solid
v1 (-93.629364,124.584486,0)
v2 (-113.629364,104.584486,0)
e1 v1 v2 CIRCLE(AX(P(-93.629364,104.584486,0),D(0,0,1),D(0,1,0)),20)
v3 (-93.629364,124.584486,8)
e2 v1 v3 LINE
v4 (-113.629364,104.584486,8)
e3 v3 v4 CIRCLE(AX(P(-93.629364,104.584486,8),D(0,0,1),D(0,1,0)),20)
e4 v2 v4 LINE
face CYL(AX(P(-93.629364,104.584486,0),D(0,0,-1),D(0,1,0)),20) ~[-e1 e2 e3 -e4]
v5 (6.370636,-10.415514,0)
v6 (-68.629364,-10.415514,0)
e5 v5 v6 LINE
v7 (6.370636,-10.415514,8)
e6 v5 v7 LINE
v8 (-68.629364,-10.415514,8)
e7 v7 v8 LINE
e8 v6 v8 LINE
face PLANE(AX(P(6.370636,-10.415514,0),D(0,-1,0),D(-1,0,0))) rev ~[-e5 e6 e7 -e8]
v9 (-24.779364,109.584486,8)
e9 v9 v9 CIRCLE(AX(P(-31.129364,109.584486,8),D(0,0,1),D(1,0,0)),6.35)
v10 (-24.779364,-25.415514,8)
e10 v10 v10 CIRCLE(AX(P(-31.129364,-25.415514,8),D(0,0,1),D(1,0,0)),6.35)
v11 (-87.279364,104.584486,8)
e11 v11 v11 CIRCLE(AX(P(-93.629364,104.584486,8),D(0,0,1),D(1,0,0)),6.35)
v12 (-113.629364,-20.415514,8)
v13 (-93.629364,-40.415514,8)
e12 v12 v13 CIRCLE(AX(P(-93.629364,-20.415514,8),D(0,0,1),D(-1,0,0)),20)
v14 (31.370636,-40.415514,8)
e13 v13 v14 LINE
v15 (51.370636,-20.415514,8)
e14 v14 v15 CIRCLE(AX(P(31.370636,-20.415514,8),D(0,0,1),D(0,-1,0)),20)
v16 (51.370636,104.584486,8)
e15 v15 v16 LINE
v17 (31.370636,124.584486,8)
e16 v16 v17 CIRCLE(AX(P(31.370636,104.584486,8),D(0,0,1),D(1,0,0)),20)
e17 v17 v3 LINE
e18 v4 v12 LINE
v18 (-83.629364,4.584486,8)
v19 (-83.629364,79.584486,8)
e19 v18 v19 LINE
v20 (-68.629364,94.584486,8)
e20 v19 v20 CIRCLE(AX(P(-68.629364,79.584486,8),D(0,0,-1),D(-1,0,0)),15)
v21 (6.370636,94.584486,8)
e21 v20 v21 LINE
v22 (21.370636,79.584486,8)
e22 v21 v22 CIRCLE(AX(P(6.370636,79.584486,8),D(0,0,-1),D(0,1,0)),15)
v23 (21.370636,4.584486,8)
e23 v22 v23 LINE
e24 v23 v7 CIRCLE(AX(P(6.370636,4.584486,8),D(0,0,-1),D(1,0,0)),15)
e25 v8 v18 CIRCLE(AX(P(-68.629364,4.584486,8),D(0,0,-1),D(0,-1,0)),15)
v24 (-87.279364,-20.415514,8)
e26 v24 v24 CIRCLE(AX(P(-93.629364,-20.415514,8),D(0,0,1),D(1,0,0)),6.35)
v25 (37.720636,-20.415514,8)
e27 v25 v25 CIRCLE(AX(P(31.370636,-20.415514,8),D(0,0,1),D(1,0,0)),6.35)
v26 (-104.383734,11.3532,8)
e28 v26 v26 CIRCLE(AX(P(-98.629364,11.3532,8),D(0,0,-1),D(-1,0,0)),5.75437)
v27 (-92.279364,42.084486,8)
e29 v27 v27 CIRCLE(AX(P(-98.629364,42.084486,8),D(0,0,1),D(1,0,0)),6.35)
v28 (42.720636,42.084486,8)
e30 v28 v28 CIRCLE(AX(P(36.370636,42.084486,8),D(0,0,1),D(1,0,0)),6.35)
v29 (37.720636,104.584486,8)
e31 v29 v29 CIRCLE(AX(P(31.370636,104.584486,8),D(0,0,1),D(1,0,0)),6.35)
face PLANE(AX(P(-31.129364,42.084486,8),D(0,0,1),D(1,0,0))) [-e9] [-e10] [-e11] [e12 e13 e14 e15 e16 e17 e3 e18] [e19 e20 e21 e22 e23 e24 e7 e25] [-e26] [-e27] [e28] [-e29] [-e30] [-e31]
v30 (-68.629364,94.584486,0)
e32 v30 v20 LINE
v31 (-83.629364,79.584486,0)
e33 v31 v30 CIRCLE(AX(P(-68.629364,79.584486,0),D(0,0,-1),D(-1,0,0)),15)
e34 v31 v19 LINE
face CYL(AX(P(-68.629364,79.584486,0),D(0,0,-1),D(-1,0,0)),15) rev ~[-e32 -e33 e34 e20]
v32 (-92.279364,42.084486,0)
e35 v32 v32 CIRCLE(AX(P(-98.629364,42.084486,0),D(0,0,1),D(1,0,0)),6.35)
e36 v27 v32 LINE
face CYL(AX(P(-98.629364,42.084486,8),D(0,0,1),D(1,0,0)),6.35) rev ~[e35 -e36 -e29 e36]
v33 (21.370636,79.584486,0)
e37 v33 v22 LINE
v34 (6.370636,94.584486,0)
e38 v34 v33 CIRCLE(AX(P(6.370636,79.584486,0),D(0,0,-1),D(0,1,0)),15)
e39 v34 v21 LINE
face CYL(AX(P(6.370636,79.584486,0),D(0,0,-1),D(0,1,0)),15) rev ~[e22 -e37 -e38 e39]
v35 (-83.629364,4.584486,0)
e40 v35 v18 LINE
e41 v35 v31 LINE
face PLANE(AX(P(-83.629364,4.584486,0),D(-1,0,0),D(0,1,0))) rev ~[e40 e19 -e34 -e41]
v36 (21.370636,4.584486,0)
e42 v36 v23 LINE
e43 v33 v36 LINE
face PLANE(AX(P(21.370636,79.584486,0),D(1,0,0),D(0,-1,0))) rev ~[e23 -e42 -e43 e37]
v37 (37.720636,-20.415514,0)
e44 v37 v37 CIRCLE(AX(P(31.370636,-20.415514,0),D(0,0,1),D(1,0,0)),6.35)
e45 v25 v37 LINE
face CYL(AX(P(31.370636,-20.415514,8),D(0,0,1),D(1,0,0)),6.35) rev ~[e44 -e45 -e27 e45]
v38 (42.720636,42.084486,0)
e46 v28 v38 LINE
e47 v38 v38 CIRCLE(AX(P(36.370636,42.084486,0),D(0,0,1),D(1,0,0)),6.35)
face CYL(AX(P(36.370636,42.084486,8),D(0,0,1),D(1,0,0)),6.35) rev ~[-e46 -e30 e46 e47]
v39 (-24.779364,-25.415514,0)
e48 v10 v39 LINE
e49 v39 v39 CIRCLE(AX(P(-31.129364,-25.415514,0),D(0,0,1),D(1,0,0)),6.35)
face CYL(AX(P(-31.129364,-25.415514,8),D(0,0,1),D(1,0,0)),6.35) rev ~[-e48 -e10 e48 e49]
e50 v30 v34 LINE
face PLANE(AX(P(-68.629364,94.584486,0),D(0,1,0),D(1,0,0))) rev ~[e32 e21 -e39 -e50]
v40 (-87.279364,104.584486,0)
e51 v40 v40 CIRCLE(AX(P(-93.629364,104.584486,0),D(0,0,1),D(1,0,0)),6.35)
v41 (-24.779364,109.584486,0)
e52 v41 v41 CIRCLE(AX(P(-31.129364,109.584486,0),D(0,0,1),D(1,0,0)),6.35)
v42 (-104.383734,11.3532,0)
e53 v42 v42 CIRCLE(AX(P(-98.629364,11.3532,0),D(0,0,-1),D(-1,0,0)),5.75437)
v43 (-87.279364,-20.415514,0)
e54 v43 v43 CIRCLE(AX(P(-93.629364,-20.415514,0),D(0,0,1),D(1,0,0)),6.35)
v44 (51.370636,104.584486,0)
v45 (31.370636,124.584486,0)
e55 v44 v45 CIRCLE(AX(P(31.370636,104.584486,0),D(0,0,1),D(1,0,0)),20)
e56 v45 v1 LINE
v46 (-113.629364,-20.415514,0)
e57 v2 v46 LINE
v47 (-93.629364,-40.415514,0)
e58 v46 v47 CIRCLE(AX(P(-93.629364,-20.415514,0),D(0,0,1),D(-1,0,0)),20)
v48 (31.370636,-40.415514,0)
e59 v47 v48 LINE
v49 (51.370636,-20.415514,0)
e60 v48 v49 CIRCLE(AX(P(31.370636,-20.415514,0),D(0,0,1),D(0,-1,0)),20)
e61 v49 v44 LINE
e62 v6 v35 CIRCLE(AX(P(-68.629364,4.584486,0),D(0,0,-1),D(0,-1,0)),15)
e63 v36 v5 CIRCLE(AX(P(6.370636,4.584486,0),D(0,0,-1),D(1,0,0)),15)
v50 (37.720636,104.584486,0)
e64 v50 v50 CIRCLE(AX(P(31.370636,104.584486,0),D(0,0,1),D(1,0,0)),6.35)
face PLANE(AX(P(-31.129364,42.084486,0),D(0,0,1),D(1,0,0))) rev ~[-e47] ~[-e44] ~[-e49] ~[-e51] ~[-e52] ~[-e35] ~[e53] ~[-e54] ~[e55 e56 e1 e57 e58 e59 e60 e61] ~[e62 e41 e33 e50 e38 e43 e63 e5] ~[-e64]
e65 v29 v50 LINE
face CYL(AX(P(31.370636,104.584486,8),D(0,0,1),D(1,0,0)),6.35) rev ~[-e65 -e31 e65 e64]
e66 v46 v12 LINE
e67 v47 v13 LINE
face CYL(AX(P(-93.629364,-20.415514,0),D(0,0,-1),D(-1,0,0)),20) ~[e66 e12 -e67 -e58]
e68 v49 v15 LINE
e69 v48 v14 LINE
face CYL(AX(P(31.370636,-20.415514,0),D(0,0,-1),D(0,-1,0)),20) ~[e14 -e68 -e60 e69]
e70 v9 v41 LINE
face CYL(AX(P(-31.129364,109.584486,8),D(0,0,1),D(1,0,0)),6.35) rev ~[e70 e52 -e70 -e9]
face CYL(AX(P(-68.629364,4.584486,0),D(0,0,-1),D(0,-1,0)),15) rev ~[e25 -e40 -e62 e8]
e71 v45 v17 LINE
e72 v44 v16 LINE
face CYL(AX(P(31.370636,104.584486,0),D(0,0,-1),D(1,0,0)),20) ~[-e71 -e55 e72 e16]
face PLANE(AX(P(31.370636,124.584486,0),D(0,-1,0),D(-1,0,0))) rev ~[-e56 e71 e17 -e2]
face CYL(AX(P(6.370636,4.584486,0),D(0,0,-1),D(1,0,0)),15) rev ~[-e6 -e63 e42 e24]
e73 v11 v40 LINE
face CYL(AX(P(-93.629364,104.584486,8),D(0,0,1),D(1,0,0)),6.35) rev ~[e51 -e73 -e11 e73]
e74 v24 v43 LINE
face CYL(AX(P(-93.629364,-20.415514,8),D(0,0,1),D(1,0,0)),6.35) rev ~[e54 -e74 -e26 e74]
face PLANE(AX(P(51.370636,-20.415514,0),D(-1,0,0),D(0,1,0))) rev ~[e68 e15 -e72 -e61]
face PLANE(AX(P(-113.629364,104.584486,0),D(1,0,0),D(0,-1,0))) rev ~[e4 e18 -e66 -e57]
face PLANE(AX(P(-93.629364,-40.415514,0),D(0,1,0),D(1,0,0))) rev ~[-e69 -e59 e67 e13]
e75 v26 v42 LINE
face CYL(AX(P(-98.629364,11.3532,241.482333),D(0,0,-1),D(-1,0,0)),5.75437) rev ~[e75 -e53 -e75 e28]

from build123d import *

# Parameters (mm, degrees)
F1_DEPTH = 8
F2_R     = 6.35
F3_DEPTH = 8.001
F4_D     = 11.50874


with BuildPart() as f1:
    # F0 (on Top) → F1 (new body)
    with BuildSketch(Plane.XY):
        with BuildLine():
            Line((31.3706356287, 124.5844857395), (-93.6293643713, 124.5844857395))
            ThreePointArc((-93.6293643713, 124.5844857395), (-107.771499995, 118.7266213632), (-113.6293643713, 104.5844857395))
            Line((-113.6293643713, 104.5844857395), (-113.6293643713, -20.4155142605))
            ThreePointArc((-113.6293643713, -20.4155142605), (-107.771499995, -34.5576498843), (-93.6293643713, -40.4155142605))
            Line((-93.6293643713, -40.4155142605), (31.3706356287, -40.4155142605))
            ThreePointArc((31.3706356287, -40.4155142605), (45.5127712524, -34.5576498843), (51.3706356287, -20.4155142605))
            Line((51.3706356287, -20.4155142605), (51.3706356287, 104.5844857395))
            ThreePointArc((51.3706356287, 104.5844857395), (45.5127712524, 118.7266213632), (31.3706356287, 124.5844857395))
        make_face()
        with BuildLine():
            ThreePointArc((-83.6293643713, 79.5844857395), (-79.2359660891, 90.1910874573), (-68.6293643713, 94.5844857395))
            Line((-68.6293643713, 94.5844857395), (6.3706356287, 94.5844857395))
            ThreePointArc((6.3706356287, 94.5844857395), (16.9772373465, 90.1910874573), (21.3706356287, 79.5844857395))
            Line((21.3706356287, 79.5844857395), (21.3706356287, 4.5844857395))
            ThreePointArc((21.3706356287, 4.5844857395), (16.9772373465, -6.0221159783), (6.3706356287, -10.4155142605))
            Line((6.3706356287, -10.4155142605), (-68.6293643713, -10.4155142605))
            ThreePointArc((-68.6293643713, -10.4155142605), (-79.2359660891, -6.0221159783), (-83.6293643713, 4.5844857395))
            Line((-83.6293643713, 4.5844857395), (-83.6293643713, 79.5844857395))
        make_face(mode=Mode.SUBTRACT)
    extrude(amount=F1_DEPTH)

    # F2 (on face) → F3 (cut, through all)
    with BuildSketch(Plane.XY.offset(8)):
        with Locations((-93.6293643713, 104.5844857395)):
            Circle(F2_R)
        with Locations((-31.1293643713, 109.5844857395)):
            Circle(F2_R)
        with Locations((31.3706356287, 104.5844857395)):
            Circle(F2_R)
        with Locations((36.3706356287, 42.0844857395)):
            Circle(F2_R)
        with Locations((31.3706356287, -20.4155142605)):
            Circle(F2_R)
        with Locations((-31.1293643713, -25.4155142605)):
            Circle(F2_R)
        with Locations((-93.6293643713, -20.4155142605)):
            Circle(F2_R)
        with Locations((-98.6293643713, 42.0844857395)):
            Circle(F2_R)
    extrude(amount=-F3_DEPTH, mode=Mode.SUBTRACT)

    # F4 (through all)
    with Locations(Plane.XY.offset(8)):
        with Locations((-98.6293643713, 11.3532003015)):
            Hole(F4_D / 2)


solid = f1.part
